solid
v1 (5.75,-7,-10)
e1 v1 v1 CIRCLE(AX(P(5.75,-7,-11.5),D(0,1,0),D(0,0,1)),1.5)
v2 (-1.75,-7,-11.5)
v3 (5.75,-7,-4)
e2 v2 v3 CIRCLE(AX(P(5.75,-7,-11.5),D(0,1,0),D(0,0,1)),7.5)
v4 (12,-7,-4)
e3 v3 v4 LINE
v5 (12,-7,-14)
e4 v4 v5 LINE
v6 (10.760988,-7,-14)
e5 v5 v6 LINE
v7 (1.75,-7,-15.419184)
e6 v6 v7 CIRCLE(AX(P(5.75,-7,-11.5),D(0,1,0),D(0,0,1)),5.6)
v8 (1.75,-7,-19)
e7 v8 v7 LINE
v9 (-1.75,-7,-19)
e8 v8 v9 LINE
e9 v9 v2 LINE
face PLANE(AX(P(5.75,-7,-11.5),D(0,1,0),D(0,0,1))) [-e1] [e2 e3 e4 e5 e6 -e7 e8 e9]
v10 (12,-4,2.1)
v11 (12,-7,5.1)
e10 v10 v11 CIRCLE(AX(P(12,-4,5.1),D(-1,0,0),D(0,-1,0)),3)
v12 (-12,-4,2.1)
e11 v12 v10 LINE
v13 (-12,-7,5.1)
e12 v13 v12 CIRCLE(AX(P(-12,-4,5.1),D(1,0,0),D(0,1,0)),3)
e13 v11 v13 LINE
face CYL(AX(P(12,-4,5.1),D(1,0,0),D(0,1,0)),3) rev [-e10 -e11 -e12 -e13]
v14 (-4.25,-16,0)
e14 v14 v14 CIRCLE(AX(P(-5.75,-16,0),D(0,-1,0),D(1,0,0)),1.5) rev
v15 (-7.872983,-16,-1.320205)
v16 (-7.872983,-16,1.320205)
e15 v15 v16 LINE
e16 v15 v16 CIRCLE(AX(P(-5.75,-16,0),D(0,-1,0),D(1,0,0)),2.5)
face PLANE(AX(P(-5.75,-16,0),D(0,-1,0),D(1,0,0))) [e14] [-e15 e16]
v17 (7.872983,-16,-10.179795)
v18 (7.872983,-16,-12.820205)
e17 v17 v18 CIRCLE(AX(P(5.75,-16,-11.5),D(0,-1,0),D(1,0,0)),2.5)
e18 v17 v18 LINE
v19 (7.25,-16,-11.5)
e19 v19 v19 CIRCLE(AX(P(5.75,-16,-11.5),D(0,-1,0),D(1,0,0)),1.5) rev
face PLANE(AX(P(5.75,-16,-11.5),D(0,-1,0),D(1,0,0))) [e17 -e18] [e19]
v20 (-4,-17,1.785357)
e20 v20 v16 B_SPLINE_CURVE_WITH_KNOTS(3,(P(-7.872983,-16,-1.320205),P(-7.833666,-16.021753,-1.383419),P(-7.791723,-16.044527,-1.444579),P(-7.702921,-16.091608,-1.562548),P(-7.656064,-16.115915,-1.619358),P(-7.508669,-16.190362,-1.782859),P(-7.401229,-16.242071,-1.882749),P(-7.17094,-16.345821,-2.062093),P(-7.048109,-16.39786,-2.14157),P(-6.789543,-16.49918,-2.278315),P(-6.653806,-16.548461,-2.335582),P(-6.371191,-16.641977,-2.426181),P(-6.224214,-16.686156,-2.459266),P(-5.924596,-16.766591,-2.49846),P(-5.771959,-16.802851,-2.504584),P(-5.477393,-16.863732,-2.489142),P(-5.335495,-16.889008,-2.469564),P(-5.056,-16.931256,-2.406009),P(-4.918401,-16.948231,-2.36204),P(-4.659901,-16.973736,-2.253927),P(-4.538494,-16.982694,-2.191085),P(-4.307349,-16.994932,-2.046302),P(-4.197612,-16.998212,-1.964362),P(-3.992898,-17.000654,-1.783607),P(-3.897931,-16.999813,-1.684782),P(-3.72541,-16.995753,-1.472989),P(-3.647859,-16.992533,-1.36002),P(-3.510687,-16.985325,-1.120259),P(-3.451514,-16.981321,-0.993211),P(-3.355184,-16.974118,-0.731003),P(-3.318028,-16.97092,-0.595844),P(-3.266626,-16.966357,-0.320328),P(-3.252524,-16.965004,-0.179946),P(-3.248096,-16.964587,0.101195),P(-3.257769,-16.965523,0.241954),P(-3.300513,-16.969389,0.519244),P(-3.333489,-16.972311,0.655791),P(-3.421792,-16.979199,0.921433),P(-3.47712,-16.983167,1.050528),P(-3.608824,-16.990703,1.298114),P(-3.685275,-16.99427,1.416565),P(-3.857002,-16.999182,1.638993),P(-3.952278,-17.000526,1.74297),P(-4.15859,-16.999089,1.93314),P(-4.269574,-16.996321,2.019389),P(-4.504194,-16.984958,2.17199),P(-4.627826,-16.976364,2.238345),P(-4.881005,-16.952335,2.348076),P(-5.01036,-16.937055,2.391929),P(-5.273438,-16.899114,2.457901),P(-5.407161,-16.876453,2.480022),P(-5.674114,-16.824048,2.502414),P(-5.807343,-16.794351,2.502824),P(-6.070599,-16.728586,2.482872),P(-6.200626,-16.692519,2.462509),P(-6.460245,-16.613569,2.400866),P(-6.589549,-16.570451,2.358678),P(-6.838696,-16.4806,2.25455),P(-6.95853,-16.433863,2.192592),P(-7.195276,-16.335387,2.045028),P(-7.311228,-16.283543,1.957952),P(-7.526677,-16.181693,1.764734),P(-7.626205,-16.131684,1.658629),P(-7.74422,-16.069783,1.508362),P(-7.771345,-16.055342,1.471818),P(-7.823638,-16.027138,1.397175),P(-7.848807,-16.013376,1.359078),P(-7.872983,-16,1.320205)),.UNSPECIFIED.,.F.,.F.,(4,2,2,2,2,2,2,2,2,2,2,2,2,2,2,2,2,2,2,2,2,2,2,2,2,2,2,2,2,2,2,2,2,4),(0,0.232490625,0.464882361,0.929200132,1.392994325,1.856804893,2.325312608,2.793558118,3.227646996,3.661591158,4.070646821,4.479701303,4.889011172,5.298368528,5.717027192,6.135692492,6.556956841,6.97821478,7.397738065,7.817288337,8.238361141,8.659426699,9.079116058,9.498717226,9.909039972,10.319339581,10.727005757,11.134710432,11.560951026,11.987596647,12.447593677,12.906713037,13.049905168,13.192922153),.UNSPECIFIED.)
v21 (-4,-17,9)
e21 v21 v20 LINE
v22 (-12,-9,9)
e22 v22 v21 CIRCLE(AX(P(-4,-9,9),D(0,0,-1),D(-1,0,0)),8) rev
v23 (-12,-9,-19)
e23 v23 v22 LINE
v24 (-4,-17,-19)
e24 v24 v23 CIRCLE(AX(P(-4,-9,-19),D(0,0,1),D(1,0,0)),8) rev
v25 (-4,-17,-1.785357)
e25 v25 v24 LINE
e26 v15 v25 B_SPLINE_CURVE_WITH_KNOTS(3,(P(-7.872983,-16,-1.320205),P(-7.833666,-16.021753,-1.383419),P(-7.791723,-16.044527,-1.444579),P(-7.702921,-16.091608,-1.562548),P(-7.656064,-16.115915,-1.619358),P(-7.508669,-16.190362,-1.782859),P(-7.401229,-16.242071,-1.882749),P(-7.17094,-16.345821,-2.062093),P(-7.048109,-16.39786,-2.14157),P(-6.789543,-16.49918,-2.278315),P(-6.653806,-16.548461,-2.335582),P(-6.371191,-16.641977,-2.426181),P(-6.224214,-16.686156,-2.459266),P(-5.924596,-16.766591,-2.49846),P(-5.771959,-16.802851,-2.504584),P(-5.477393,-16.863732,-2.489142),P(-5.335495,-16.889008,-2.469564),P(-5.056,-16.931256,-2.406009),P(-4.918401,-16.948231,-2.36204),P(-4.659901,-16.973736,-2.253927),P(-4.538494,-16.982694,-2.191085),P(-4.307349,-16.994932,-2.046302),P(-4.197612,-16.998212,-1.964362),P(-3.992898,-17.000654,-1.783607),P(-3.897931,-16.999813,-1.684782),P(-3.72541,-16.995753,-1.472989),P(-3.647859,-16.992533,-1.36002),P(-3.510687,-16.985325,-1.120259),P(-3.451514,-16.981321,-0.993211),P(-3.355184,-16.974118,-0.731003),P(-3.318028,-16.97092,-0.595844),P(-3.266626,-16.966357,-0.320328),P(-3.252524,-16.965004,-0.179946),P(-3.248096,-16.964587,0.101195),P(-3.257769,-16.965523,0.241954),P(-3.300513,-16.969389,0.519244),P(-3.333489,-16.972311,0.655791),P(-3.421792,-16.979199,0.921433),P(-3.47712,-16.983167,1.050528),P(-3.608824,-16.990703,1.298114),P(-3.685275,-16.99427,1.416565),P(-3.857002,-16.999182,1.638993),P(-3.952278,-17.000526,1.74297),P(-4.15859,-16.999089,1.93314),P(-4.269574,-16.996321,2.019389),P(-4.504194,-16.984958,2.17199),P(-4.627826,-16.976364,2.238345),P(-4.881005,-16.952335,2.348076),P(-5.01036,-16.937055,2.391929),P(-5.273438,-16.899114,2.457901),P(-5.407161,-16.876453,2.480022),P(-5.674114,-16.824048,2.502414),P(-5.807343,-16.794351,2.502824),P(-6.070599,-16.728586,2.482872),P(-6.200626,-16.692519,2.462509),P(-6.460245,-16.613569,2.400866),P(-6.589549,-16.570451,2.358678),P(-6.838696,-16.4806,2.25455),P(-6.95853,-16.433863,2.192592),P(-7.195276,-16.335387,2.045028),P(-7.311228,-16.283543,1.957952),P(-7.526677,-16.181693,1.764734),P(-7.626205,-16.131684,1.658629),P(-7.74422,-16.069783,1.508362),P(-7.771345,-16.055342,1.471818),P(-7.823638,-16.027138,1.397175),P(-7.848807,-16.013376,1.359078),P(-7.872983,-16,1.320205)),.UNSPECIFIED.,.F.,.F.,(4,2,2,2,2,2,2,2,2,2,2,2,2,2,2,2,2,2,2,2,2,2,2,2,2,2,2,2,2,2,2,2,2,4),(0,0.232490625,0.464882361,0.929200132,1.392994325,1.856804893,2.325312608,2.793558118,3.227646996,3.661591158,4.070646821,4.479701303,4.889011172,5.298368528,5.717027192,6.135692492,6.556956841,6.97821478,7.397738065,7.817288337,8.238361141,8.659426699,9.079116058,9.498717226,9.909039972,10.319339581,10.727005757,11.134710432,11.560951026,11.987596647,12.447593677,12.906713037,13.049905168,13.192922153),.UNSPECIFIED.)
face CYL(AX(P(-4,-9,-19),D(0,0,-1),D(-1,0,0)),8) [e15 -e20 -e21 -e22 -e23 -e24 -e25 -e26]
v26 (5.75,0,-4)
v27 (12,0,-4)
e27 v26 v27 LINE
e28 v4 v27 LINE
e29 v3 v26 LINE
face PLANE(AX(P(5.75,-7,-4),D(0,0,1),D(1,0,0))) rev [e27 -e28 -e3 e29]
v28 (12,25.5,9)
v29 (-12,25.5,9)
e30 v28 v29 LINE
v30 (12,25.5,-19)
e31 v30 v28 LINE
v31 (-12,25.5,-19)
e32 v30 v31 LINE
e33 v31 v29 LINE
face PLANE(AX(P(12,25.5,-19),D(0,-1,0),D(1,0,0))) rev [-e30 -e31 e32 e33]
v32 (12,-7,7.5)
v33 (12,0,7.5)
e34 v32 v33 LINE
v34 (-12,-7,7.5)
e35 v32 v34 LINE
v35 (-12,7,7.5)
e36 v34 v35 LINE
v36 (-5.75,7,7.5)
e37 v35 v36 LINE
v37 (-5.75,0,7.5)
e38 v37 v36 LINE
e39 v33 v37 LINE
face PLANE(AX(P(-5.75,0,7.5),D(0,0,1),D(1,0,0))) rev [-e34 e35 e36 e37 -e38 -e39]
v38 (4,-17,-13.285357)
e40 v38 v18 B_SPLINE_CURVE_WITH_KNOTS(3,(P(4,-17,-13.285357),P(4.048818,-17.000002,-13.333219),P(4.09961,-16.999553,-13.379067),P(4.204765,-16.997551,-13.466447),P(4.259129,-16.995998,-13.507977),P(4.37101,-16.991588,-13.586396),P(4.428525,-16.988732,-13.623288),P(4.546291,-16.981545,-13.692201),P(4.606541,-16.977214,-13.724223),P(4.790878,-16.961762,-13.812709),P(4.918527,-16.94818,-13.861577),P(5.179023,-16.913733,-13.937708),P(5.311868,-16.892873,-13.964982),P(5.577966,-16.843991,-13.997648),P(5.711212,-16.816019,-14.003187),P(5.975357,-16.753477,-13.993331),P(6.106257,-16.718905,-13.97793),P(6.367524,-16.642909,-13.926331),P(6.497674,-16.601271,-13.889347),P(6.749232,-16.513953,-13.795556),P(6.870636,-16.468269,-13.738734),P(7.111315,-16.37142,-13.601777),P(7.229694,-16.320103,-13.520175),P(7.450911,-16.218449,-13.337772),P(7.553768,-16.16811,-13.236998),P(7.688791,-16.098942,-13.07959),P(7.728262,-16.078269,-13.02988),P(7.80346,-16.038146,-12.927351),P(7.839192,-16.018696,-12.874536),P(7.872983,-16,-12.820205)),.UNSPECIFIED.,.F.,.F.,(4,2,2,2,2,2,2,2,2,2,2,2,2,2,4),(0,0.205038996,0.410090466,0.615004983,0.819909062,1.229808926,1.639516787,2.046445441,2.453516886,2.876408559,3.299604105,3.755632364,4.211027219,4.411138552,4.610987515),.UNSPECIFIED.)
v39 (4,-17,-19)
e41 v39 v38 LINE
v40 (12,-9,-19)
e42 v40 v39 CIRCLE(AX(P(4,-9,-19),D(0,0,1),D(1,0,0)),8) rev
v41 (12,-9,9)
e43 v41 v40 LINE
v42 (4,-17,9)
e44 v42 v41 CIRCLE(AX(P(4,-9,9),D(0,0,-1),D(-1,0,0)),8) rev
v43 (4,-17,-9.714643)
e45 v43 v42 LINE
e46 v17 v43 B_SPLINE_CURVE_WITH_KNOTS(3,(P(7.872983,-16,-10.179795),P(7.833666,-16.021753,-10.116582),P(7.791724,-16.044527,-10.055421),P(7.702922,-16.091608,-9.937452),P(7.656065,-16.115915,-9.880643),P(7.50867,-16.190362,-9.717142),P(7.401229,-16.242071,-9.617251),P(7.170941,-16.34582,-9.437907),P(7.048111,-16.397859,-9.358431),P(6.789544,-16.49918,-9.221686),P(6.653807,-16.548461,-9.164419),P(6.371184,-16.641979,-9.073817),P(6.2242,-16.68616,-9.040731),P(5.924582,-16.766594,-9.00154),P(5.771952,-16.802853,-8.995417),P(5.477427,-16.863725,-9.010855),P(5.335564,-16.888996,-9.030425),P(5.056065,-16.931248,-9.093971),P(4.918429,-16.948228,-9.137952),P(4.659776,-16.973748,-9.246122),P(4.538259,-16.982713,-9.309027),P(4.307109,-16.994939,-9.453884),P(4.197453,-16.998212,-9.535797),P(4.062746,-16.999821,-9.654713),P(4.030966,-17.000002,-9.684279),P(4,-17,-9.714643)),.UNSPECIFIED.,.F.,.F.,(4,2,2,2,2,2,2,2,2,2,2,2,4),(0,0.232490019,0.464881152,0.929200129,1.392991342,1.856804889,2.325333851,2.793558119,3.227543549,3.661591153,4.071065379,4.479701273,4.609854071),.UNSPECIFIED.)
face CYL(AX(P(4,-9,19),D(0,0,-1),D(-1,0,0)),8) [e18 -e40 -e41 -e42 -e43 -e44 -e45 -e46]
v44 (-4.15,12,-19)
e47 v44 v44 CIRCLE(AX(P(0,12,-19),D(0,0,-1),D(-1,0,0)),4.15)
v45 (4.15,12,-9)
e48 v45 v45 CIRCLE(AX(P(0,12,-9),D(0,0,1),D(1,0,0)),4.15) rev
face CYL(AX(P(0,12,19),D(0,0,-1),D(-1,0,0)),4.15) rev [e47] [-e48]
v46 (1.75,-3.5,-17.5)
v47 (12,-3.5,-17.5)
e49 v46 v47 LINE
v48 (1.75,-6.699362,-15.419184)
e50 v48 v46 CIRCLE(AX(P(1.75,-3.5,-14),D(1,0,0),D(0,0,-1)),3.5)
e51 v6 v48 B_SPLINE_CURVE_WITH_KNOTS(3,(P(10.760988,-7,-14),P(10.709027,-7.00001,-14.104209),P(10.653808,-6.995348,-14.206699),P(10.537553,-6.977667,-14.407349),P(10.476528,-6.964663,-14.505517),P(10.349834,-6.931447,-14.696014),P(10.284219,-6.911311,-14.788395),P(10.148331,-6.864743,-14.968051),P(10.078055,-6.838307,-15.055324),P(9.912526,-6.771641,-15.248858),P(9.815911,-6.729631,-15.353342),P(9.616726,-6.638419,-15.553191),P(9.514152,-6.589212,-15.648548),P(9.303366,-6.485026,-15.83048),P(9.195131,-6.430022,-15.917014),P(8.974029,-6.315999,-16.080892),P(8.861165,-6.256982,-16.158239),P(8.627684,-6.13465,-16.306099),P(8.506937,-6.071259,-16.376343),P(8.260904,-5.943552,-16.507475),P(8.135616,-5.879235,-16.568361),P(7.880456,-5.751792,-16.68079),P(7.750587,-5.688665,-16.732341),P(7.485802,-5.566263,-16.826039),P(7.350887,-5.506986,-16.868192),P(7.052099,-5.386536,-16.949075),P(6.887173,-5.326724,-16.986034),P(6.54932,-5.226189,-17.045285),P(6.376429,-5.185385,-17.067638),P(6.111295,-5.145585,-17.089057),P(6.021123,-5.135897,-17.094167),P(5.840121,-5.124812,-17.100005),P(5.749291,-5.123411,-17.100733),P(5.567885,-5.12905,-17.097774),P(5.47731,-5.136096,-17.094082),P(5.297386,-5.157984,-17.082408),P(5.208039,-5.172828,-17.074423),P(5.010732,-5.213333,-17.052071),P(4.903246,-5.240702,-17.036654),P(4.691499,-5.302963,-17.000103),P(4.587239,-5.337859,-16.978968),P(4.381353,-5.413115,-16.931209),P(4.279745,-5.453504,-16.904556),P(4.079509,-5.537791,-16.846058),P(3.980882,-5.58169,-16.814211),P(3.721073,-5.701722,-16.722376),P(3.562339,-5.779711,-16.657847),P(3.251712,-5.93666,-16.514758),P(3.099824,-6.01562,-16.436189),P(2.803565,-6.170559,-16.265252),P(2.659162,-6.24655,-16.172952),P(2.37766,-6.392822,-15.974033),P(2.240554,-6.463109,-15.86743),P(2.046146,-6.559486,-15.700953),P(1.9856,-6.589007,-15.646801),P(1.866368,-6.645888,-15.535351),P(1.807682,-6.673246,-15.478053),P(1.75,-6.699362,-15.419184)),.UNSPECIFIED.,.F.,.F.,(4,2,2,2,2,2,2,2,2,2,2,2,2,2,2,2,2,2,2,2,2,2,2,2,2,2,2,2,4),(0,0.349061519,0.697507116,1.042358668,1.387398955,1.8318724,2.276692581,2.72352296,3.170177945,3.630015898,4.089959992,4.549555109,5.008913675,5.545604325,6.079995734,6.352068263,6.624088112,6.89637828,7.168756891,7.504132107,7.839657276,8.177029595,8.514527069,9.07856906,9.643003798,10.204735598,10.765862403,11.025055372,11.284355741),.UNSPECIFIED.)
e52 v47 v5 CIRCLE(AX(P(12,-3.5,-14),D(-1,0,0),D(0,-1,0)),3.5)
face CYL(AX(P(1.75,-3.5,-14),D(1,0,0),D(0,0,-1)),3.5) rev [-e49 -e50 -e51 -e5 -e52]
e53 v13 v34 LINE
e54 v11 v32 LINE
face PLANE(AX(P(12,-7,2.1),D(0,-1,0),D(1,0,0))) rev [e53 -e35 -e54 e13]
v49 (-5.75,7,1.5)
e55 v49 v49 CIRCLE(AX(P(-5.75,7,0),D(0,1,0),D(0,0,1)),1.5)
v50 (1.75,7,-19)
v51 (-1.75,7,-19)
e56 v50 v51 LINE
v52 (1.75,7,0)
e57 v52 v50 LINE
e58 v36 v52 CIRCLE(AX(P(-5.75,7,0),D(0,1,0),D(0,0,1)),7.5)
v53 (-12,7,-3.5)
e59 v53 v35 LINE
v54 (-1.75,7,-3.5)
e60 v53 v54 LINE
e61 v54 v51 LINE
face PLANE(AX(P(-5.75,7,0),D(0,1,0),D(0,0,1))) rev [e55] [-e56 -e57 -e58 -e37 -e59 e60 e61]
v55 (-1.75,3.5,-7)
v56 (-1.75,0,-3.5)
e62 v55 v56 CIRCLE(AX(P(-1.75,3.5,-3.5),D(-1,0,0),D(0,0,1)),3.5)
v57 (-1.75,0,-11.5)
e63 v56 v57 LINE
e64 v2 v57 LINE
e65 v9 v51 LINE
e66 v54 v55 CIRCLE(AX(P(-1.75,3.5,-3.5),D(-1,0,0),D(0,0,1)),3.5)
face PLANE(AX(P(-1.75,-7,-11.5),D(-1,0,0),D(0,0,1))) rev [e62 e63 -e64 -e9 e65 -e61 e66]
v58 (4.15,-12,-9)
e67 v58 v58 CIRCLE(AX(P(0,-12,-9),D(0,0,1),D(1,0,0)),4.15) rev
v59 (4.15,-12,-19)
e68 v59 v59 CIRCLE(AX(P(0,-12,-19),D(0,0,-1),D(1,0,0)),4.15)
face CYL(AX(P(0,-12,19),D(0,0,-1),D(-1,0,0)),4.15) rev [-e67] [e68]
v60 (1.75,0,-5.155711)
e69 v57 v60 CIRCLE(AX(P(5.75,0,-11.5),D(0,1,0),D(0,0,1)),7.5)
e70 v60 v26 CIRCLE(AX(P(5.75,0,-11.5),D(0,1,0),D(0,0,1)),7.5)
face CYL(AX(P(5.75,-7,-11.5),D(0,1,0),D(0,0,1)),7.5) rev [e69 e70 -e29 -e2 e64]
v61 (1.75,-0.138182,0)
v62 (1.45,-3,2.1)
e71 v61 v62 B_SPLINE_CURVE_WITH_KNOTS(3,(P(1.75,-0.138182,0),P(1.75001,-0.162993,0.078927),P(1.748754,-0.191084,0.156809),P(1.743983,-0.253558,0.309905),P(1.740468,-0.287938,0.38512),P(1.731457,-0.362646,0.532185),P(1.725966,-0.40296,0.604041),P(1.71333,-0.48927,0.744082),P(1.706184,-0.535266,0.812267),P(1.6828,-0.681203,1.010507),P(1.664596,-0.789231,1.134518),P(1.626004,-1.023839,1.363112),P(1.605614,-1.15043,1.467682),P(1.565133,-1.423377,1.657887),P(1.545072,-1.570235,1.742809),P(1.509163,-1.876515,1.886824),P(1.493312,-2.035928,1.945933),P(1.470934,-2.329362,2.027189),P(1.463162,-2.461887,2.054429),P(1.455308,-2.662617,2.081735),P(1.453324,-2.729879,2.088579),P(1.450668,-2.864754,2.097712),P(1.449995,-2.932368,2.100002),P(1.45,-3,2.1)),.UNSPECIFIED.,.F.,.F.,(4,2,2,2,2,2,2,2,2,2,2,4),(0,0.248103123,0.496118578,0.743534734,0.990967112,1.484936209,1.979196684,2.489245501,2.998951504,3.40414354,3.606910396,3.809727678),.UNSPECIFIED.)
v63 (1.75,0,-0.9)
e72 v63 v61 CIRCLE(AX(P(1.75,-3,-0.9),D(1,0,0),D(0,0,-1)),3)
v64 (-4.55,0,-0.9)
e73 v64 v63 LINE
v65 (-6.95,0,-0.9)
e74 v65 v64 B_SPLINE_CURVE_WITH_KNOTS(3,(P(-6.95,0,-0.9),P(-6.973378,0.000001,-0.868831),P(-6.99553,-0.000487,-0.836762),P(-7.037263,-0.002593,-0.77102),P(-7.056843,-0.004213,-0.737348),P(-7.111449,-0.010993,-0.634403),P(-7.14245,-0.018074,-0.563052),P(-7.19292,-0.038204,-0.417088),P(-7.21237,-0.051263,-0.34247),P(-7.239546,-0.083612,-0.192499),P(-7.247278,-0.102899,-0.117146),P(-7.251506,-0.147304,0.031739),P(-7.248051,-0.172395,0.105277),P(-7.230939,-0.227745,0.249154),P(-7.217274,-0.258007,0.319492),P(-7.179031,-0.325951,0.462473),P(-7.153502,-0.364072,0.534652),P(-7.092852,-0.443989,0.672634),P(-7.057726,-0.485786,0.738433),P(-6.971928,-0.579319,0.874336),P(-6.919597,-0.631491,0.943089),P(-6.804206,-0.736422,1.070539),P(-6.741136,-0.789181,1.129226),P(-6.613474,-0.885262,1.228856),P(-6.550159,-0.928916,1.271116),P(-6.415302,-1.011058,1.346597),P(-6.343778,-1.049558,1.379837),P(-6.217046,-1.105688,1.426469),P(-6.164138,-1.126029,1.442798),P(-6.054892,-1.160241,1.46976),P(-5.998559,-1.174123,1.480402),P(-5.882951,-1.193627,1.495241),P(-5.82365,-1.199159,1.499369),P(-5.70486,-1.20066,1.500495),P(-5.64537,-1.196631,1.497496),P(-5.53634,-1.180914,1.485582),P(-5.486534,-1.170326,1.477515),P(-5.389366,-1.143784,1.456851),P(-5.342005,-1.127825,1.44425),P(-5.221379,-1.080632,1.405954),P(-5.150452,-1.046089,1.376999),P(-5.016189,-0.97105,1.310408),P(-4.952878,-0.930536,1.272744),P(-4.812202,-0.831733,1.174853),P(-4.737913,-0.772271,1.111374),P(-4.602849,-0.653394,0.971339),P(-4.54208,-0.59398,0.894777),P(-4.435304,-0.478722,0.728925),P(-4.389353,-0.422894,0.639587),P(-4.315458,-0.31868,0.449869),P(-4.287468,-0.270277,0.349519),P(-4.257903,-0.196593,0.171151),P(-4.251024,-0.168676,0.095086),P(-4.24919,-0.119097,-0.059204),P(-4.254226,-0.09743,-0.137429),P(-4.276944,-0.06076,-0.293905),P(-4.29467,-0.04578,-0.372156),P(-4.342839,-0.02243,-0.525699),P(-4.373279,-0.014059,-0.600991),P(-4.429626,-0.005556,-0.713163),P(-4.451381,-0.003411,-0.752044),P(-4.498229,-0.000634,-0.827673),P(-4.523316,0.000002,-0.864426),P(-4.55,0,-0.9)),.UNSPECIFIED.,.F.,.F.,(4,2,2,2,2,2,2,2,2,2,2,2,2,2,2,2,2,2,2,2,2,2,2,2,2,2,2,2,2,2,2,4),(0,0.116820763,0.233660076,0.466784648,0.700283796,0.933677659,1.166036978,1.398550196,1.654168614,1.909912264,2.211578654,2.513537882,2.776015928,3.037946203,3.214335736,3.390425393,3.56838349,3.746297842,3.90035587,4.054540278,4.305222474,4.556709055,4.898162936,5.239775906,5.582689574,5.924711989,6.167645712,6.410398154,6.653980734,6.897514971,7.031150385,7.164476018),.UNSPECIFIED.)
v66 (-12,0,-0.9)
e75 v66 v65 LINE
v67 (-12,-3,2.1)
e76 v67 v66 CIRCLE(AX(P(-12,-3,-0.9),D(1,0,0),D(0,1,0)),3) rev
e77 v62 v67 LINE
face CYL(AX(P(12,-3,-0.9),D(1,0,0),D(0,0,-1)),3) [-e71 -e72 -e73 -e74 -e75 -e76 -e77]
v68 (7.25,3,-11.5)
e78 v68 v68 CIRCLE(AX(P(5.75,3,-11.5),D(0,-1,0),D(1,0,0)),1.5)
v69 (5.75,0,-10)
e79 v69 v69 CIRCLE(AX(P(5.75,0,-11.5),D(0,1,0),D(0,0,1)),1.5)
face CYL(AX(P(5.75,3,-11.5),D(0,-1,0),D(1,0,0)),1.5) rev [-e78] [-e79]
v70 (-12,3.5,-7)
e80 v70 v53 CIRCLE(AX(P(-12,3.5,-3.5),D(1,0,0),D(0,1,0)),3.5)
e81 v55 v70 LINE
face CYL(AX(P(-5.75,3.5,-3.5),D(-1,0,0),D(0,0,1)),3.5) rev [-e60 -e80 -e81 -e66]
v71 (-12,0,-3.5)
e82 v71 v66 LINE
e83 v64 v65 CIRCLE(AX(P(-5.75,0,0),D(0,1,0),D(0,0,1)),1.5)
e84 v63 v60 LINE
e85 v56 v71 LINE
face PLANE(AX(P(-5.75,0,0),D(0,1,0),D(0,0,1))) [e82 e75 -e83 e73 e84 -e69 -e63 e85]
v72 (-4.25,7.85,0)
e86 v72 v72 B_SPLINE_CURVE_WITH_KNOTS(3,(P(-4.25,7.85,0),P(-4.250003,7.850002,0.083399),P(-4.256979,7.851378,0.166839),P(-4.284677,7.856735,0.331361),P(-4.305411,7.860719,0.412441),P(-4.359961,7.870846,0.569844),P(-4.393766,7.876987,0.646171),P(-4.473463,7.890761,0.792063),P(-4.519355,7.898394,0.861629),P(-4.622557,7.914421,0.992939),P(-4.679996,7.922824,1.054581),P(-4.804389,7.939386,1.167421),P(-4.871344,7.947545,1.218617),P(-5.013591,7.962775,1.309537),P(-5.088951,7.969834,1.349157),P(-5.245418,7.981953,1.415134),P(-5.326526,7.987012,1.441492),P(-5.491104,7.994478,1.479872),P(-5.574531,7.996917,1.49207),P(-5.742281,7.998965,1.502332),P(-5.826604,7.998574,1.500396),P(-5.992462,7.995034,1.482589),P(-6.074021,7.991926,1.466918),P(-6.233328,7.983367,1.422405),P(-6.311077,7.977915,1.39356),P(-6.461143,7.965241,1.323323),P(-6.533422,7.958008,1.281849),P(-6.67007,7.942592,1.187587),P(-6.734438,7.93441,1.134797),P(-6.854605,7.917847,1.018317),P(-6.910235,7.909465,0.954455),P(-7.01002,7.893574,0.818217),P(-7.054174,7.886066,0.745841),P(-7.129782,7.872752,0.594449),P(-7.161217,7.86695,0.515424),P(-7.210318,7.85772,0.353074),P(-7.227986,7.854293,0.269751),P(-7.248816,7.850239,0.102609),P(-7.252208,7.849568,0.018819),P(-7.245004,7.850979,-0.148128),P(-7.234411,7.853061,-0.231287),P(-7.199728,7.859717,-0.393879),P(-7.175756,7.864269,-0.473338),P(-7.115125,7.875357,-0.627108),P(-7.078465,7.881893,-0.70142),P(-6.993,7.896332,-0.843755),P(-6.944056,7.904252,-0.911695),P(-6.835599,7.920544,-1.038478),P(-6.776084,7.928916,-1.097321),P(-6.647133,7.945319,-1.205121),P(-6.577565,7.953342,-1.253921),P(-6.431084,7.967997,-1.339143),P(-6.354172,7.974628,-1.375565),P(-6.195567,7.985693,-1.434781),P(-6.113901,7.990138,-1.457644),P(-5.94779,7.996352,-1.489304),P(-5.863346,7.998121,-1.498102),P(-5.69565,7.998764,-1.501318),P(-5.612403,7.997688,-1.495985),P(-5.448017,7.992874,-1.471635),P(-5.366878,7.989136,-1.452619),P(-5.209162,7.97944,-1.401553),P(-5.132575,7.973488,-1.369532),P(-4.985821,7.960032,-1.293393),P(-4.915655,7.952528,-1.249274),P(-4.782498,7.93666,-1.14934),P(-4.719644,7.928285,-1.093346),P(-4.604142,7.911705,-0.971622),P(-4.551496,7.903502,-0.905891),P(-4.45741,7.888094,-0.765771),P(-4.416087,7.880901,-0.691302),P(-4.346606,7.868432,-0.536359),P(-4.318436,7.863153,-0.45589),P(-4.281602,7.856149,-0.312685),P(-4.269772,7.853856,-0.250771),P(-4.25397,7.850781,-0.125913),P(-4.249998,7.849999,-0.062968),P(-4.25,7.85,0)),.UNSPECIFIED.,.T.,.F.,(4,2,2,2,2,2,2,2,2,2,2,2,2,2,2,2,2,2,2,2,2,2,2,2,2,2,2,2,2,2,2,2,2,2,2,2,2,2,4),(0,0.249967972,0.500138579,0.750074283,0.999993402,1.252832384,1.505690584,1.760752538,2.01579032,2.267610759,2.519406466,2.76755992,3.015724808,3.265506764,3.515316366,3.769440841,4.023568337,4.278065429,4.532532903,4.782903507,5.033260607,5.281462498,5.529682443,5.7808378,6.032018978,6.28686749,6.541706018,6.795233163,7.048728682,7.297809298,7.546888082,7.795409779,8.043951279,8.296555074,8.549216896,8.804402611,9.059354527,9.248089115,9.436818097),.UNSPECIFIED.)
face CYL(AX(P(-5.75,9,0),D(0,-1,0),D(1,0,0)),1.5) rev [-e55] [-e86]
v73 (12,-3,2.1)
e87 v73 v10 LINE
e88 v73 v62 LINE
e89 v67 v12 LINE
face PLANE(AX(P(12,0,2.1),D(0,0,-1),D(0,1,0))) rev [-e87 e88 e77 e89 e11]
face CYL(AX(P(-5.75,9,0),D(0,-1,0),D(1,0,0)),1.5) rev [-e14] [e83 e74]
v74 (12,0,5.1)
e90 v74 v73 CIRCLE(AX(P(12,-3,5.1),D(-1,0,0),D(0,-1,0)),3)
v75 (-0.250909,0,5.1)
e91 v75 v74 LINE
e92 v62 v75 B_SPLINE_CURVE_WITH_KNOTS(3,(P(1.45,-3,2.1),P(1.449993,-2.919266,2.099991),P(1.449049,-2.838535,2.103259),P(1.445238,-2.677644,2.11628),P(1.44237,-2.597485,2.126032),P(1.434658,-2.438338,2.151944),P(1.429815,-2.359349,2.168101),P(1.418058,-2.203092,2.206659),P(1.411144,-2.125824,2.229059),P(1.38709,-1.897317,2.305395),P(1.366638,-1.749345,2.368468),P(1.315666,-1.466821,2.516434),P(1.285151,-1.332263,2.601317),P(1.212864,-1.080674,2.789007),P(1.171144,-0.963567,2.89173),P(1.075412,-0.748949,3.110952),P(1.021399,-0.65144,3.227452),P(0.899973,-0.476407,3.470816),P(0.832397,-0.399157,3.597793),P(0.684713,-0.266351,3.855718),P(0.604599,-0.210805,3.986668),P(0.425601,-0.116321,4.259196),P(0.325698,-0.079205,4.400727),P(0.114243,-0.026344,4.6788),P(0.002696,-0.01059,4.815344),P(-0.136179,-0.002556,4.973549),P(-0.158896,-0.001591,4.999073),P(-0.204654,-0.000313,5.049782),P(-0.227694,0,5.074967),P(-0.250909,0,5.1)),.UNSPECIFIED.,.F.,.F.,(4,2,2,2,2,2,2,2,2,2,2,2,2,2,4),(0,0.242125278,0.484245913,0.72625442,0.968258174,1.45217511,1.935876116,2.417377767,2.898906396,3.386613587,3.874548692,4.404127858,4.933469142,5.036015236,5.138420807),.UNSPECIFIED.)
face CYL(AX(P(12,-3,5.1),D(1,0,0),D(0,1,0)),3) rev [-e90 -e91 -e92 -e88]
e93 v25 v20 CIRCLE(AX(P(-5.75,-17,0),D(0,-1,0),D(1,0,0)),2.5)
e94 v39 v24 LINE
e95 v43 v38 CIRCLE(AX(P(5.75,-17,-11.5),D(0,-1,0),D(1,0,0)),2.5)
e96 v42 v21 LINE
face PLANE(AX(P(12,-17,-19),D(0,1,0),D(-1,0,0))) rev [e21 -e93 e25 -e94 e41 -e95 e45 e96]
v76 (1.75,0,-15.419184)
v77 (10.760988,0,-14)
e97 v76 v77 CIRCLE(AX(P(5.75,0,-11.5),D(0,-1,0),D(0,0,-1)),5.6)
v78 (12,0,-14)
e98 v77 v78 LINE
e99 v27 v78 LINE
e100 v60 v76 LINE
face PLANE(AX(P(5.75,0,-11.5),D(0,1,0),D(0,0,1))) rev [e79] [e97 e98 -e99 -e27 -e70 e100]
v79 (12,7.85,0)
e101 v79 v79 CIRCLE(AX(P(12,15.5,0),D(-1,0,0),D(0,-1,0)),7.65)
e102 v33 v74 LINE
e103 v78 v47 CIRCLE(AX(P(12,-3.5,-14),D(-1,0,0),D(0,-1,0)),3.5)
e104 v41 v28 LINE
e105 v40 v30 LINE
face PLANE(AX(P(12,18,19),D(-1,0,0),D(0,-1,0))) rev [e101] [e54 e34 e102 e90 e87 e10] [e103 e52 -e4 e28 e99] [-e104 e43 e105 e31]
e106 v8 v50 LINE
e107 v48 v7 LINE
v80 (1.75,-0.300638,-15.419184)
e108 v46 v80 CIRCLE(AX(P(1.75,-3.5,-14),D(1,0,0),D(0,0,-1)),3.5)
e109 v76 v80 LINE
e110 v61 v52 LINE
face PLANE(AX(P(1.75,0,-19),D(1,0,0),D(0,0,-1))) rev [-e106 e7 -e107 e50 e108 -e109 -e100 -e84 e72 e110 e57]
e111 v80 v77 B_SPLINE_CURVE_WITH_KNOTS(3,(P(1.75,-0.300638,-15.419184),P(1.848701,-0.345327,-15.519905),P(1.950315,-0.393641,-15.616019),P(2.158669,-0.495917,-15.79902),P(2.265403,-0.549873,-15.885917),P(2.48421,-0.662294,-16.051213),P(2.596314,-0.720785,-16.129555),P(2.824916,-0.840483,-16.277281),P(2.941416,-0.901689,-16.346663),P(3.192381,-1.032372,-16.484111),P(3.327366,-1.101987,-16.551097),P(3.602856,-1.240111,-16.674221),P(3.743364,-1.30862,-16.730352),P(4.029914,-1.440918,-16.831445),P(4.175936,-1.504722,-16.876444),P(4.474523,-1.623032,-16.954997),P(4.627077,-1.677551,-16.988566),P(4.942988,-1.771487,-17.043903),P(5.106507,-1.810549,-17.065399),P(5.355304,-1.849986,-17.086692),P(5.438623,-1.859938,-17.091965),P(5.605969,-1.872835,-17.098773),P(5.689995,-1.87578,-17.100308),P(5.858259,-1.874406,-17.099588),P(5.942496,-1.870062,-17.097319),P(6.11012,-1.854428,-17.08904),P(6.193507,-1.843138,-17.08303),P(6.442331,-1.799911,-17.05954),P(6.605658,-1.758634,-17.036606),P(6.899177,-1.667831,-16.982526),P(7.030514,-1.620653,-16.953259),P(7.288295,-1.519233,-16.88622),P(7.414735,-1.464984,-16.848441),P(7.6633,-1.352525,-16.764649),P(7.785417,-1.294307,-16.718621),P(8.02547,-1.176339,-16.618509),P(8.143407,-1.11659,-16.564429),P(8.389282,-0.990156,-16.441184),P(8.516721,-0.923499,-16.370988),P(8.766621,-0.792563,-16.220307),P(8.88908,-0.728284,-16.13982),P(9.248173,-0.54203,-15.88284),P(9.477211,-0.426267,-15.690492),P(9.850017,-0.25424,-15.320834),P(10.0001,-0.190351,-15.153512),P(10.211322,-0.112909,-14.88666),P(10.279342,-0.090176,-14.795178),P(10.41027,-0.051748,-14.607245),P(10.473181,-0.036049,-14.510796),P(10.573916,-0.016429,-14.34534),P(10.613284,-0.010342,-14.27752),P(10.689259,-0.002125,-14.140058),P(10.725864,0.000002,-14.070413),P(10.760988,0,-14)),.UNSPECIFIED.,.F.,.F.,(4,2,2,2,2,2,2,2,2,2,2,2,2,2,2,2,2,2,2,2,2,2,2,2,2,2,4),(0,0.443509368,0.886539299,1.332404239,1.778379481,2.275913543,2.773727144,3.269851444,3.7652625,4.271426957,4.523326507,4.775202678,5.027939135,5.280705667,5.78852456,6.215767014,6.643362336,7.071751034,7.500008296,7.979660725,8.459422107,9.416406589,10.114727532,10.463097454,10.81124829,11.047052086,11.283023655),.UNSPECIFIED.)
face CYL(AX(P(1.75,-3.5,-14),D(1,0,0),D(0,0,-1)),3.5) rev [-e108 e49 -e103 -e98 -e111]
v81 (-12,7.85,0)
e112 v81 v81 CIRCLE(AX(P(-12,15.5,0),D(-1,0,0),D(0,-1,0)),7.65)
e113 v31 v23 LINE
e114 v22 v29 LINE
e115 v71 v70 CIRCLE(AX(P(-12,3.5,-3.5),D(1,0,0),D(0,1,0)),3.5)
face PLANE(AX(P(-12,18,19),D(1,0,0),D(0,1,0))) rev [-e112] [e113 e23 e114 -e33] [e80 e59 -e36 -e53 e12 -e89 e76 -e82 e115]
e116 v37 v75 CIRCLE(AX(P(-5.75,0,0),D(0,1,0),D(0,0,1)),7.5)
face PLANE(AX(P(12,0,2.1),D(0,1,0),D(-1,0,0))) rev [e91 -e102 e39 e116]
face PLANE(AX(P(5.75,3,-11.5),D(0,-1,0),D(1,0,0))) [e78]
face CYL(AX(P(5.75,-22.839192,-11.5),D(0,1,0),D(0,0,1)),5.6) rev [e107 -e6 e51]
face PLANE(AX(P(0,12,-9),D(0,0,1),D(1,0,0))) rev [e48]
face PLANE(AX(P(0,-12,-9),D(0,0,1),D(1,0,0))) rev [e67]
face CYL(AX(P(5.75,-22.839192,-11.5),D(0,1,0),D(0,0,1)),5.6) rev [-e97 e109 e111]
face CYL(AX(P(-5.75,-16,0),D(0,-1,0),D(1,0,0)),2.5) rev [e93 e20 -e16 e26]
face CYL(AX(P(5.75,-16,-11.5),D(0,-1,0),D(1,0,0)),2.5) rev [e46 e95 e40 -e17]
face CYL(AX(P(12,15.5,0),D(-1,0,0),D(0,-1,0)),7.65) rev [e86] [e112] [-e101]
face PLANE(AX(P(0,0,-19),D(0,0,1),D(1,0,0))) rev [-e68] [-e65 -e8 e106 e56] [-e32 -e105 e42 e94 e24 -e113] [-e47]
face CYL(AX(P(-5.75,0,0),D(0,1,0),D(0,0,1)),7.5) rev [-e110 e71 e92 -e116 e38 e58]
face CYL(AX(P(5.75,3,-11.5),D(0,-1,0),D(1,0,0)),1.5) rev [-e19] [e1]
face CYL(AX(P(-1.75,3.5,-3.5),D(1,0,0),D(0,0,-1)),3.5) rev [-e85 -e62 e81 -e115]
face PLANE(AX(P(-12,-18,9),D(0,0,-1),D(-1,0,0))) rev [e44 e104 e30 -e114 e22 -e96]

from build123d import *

# Parameters (mm, degrees)
SKETCH_1_W           = 24
SKETCH_1_H           = 36
EXTRUDE_1_DEPTH      = 19
CUT_EXTRUDE_2_DEPTH  = 3.5
SKETCH_4_W           = 5.4
SKETCH_4_H           = 7
CUT_EXTRUDE_3_DEPTH  = 36.510561809
CUT_EXTRUDE_4_DEPTH  = 3.5
SKETCH_6_R           = 4.15
CUT_EXTRUDE_5_DEPTH  = 44.726422218
FILLET_2_R           = 3
SKETCH_10_W          = 10
SKETCH_10_H          = 36
CUT_EXTRUDE_9_DEPTH  = 36.510561809
SKETCH_11_W          = 28
SKETCH_11_H          = 16.5
EXTRUDE_3_DEPTH      = 24
SKETCH_12_W          = 10.25
SKETCH_12_H          = 12
EXTRUDE_4_DEPTH      = 7
FILLET_3_R           = 3.5
SKETCH_13_W          = 10.25
SKETCH_13_H          = 1.5
EXTRUDE_5_DEPTH      = 7
FILLET_4_R           = 3.5
SKETCH_14_R          = 5.6
CUT_EXTRUDE_10_DEPTH = 7
FILLET_6_R           = 3
EXTRUDE_START        = -18
SKETCH_16_R          = 4.15
EXTRUDE_6_DEPTH      = 18
SKETCH_17_R          = 7.65
SKETCH_17_W          = 28
SKETCH_17_H          = 17.5
SKETCH_17_H_2        = 9
CUT_EXTRUDE_11_DEPTH = 47.122120558
FILLET_7_R           = 8
SKETCH_18_R          = 1.5
CUT_EXTRUDE_12_DEPTH = 26
SKETCH_19_R          = 1.5
CUT_EXTRUDE_13_DEPTH = 20
SKETCH_20_R          = 2.5
CUT_EXTRUDE_14_DEPTH = 1


with BuildPart() as part:
    # 草图1 → 凸台-拉伸1 (new, symmetric)
    with BuildSketch(Plane.XY):
        Rectangle(SKETCH_1_W, SKETCH_1_H)
    extrude(amount=EXTRUDE_1_DEPTH, both=True)

    # 草图3 → 切除-拉伸2 (cut, symmetric)
    with BuildSketch(Plane(origin=(0, 3.5, 0), x_dir=(1, 0, 0), z_dir=(0, 1, 0))):
        with BuildLine():
            Line((-5.75, -7.5), (-12, -7.5))
            Line((-12, -7.5), (-12, 19))
            Line((-12, 19), (1.75, 19))
            Line((1.75, 19), (1.75, 0))
            ThreePointArc((1.75, 0), (-0.446699141, -5.303300859), (-5.75, -7.5))
        make_face()
    extrude(amount=CUT_EXTRUDE_2_DEPTH, both=True, mode=Mode.SUBTRACT)

    # 草图4 → 切除-拉伸3 (cut, through all)
    with BuildSketch(Plane.ZY.offset(12)):
        with Locations((4.8, -3.5)):
            Rectangle(SKETCH_4_W, SKETCH_4_H)
    extrude(amount=-CUT_EXTRUDE_3_DEPTH, mode=Mode.SUBTRACT)

    # 草图5 → 切除-拉伸4 (cut, symmetric)
    with BuildSketch(Plane(origin=(0, -3.5, 0), x_dir=(1, 0, 0), z_dir=(0, 1, 0))):
        with BuildLine():
            Line((5.75, 4), (12, 4))
            Line((12, 4), (12, 19))
            Line((12, 19), (-1.75, 19))
            Line((-1.75, 19), (-1.75, 11.5))
            ThreePointArc((-1.75, 11.5), (0.446699141, 6.196699141), (5.75, 4))
        make_face()
    extrude(amount=CUT_EXTRUDE_4_DEPTH, both=True, mode=Mode.SUBTRACT)

    # 草图6 → 切除-拉伸5 (cut, through all)
    with BuildSketch(Plane(origin=(0, 0, -19), x_dir=(-1, 0, 0), z_dir=(0, 0, -1))):
        with Locations((0, 12)):
            Circle(SKETCH_6_R)
        with Locations(Location((0, -12, 0), (0, 0, 180))):
            Circle(SKETCH_6_R)
    extrude(amount=-CUT_EXTRUDE_5_DEPTH, mode=Mode.SUBTRACT)

    # 圆角2
    fillet_2_edges = [part.edges().sort_by_distance(p)[0] for p in [
        (6.725, 0, 2.1),
        (0, -7, 2.1),
    ]]
    fillet(fillet_2_edges, radius=FILLET_2_R)

    # 草图10 → 切除-拉伸9 (cut, through all)
    with BuildSketch(Plane(origin=(12, 0, 0), x_dir=(0, 0, -1), z_dir=(1, 0, 0))):
        with Locations((-14, 0)):
            Rectangle(SKETCH_10_W, SKETCH_10_H)
    extrude(amount=-CUT_EXTRUDE_9_DEPTH, mode=Mode.SUBTRACT)

    # 草图11 → 凸台-拉伸3 (add)
    with BuildSketch(Plane.ZY.offset(12)):
        with Locations((-5, -26.25)):
            Rectangle(SKETCH_11_W, SKETCH_11_H)
    extrude_3 = extrude(amount=-EXTRUDE_3_DEPTH)

    # 镜向2: 凸台-拉伸3 across plane
    add(extrude_3.mirror(Plane.ZX))

    # 草图12 → 凸台-拉伸4 (add)
    with BuildSketch(Plane(origin=(0, 0, 0), x_dir=(1, 0, 0), z_dir=(0, 1, 0))):
        with Locations((-6.875, 13)):
            Rectangle(SKETCH_12_W, SKETCH_12_H)
    extrude(amount=EXTRUDE_4_DEPTH)

    # 圆角3
    fillet_3_edges = [part.edges().sort_by_distance(p)[0] for p in [
        (-6.875, 0, -7),
        (-6.875, 7, -7),
    ]]
    fillet(fillet_3_edges, radius=FILLET_3_R - 0.0001)  # a hair under: the kernel refuses the full size

    # 草图13 → 凸台-拉伸5 (add)
    with BuildSketch(Plane.XZ):
        with Locations((6.875, -18.25)):
            Rectangle(SKETCH_13_W, SKETCH_13_H)
    extrude(amount=EXTRUDE_5_DEPTH)

    # 圆角4
    fillet_4_edges = [part.edges().sort_by_distance(p)[0] for p in [
        (6.875, 0, -17.5),
        (6.875, -7, -17.5),
    ]]
    fillet(fillet_4_edges, radius=FILLET_4_R - 0.0001)  # a hair under: the kernel refuses the full size

    # 草图14 → 切除-拉伸10 (cut)
    with BuildSketch(Plane.XZ):
        with Locations((5.75, -11.5)):
            Circle(SKETCH_14_R)
    extrude(amount=CUT_EXTRUDE_10_DEPTH, mode=Mode.SUBTRACT)

    # 圆角6
    fillet_6_edges = [part.edges().sort_by_distance(p)[0] for p in [
        (-5.275, 0, 2.1),
    ]]
    fillet(fillet_6_edges, radius=FILLET_6_R)

    # 草图16 → 凸台-拉伸6 (add)
    with BuildSketch(Plane.XY.offset(9).offset(EXTRUDE_START)):
        with Locations((0, -12)):
            Circle(SKETCH_16_R)
        with Locations(Location((0, 12, 0), (0, 0, 180))):
            Circle(SKETCH_16_R)
    extrude(amount=EXTRUDE_6_DEPTH)

    # 草图17 → 切除-拉伸11 (cut, through all)
    with BuildSketch(Plane.ZY.offset(12)):
        with Locations(Location((0, 15.5, 0), (0, 0, 270))):
            Circle(SKETCH_17_R)
        with Locations((-5, -25.75)):
            Rectangle(SKETCH_17_W, SKETCH_17_H)
        with Locations((-5, 30)):
            Rectangle(SKETCH_17_W, SKETCH_17_H_2)
    extrude(amount=-CUT_EXTRUDE_11_DEPTH, mode=Mode.SUBTRACT)

    # 圆角7
    fillet_7_edges = [part.edges().sort_by_distance(p)[0] for p in [
        (12, -17, -5),
        (-12, -17, -5),
    ]]
    fillet(fillet_7_edges, radius=FILLET_7_R)

    # 草图18 → 切除-拉伸12 (cut)
    with BuildSketch(Plane.XZ.offset(17)):
        with Locations((-5.75, 0)):
            Circle(SKETCH_18_R)
    extrude(amount=-CUT_EXTRUDE_12_DEPTH, mode=Mode.SUBTRACT)

    # 草图19 → 切除-拉伸13 (cut)
    with BuildSketch(Plane.XZ.offset(17)):
        with Locations((5.75, -11.5)):
            Circle(SKETCH_19_R)
    extrude(amount=-CUT_EXTRUDE_13_DEPTH, mode=Mode.SUBTRACT)

    # 草图20 → 切除-拉伸14 (cut)
    with BuildSketch(Plane.XZ.offset(17)):
        with Locations((5.75, -11.5)):
            Circle(SKETCH_20_R)
        with Locations((-5.75, 0)):
            Circle(SKETCH_20_R)
    extrude(amount=-CUT_EXTRUDE_14_DEPTH, mode=Mode.SUBTRACT)


solid = part.part
